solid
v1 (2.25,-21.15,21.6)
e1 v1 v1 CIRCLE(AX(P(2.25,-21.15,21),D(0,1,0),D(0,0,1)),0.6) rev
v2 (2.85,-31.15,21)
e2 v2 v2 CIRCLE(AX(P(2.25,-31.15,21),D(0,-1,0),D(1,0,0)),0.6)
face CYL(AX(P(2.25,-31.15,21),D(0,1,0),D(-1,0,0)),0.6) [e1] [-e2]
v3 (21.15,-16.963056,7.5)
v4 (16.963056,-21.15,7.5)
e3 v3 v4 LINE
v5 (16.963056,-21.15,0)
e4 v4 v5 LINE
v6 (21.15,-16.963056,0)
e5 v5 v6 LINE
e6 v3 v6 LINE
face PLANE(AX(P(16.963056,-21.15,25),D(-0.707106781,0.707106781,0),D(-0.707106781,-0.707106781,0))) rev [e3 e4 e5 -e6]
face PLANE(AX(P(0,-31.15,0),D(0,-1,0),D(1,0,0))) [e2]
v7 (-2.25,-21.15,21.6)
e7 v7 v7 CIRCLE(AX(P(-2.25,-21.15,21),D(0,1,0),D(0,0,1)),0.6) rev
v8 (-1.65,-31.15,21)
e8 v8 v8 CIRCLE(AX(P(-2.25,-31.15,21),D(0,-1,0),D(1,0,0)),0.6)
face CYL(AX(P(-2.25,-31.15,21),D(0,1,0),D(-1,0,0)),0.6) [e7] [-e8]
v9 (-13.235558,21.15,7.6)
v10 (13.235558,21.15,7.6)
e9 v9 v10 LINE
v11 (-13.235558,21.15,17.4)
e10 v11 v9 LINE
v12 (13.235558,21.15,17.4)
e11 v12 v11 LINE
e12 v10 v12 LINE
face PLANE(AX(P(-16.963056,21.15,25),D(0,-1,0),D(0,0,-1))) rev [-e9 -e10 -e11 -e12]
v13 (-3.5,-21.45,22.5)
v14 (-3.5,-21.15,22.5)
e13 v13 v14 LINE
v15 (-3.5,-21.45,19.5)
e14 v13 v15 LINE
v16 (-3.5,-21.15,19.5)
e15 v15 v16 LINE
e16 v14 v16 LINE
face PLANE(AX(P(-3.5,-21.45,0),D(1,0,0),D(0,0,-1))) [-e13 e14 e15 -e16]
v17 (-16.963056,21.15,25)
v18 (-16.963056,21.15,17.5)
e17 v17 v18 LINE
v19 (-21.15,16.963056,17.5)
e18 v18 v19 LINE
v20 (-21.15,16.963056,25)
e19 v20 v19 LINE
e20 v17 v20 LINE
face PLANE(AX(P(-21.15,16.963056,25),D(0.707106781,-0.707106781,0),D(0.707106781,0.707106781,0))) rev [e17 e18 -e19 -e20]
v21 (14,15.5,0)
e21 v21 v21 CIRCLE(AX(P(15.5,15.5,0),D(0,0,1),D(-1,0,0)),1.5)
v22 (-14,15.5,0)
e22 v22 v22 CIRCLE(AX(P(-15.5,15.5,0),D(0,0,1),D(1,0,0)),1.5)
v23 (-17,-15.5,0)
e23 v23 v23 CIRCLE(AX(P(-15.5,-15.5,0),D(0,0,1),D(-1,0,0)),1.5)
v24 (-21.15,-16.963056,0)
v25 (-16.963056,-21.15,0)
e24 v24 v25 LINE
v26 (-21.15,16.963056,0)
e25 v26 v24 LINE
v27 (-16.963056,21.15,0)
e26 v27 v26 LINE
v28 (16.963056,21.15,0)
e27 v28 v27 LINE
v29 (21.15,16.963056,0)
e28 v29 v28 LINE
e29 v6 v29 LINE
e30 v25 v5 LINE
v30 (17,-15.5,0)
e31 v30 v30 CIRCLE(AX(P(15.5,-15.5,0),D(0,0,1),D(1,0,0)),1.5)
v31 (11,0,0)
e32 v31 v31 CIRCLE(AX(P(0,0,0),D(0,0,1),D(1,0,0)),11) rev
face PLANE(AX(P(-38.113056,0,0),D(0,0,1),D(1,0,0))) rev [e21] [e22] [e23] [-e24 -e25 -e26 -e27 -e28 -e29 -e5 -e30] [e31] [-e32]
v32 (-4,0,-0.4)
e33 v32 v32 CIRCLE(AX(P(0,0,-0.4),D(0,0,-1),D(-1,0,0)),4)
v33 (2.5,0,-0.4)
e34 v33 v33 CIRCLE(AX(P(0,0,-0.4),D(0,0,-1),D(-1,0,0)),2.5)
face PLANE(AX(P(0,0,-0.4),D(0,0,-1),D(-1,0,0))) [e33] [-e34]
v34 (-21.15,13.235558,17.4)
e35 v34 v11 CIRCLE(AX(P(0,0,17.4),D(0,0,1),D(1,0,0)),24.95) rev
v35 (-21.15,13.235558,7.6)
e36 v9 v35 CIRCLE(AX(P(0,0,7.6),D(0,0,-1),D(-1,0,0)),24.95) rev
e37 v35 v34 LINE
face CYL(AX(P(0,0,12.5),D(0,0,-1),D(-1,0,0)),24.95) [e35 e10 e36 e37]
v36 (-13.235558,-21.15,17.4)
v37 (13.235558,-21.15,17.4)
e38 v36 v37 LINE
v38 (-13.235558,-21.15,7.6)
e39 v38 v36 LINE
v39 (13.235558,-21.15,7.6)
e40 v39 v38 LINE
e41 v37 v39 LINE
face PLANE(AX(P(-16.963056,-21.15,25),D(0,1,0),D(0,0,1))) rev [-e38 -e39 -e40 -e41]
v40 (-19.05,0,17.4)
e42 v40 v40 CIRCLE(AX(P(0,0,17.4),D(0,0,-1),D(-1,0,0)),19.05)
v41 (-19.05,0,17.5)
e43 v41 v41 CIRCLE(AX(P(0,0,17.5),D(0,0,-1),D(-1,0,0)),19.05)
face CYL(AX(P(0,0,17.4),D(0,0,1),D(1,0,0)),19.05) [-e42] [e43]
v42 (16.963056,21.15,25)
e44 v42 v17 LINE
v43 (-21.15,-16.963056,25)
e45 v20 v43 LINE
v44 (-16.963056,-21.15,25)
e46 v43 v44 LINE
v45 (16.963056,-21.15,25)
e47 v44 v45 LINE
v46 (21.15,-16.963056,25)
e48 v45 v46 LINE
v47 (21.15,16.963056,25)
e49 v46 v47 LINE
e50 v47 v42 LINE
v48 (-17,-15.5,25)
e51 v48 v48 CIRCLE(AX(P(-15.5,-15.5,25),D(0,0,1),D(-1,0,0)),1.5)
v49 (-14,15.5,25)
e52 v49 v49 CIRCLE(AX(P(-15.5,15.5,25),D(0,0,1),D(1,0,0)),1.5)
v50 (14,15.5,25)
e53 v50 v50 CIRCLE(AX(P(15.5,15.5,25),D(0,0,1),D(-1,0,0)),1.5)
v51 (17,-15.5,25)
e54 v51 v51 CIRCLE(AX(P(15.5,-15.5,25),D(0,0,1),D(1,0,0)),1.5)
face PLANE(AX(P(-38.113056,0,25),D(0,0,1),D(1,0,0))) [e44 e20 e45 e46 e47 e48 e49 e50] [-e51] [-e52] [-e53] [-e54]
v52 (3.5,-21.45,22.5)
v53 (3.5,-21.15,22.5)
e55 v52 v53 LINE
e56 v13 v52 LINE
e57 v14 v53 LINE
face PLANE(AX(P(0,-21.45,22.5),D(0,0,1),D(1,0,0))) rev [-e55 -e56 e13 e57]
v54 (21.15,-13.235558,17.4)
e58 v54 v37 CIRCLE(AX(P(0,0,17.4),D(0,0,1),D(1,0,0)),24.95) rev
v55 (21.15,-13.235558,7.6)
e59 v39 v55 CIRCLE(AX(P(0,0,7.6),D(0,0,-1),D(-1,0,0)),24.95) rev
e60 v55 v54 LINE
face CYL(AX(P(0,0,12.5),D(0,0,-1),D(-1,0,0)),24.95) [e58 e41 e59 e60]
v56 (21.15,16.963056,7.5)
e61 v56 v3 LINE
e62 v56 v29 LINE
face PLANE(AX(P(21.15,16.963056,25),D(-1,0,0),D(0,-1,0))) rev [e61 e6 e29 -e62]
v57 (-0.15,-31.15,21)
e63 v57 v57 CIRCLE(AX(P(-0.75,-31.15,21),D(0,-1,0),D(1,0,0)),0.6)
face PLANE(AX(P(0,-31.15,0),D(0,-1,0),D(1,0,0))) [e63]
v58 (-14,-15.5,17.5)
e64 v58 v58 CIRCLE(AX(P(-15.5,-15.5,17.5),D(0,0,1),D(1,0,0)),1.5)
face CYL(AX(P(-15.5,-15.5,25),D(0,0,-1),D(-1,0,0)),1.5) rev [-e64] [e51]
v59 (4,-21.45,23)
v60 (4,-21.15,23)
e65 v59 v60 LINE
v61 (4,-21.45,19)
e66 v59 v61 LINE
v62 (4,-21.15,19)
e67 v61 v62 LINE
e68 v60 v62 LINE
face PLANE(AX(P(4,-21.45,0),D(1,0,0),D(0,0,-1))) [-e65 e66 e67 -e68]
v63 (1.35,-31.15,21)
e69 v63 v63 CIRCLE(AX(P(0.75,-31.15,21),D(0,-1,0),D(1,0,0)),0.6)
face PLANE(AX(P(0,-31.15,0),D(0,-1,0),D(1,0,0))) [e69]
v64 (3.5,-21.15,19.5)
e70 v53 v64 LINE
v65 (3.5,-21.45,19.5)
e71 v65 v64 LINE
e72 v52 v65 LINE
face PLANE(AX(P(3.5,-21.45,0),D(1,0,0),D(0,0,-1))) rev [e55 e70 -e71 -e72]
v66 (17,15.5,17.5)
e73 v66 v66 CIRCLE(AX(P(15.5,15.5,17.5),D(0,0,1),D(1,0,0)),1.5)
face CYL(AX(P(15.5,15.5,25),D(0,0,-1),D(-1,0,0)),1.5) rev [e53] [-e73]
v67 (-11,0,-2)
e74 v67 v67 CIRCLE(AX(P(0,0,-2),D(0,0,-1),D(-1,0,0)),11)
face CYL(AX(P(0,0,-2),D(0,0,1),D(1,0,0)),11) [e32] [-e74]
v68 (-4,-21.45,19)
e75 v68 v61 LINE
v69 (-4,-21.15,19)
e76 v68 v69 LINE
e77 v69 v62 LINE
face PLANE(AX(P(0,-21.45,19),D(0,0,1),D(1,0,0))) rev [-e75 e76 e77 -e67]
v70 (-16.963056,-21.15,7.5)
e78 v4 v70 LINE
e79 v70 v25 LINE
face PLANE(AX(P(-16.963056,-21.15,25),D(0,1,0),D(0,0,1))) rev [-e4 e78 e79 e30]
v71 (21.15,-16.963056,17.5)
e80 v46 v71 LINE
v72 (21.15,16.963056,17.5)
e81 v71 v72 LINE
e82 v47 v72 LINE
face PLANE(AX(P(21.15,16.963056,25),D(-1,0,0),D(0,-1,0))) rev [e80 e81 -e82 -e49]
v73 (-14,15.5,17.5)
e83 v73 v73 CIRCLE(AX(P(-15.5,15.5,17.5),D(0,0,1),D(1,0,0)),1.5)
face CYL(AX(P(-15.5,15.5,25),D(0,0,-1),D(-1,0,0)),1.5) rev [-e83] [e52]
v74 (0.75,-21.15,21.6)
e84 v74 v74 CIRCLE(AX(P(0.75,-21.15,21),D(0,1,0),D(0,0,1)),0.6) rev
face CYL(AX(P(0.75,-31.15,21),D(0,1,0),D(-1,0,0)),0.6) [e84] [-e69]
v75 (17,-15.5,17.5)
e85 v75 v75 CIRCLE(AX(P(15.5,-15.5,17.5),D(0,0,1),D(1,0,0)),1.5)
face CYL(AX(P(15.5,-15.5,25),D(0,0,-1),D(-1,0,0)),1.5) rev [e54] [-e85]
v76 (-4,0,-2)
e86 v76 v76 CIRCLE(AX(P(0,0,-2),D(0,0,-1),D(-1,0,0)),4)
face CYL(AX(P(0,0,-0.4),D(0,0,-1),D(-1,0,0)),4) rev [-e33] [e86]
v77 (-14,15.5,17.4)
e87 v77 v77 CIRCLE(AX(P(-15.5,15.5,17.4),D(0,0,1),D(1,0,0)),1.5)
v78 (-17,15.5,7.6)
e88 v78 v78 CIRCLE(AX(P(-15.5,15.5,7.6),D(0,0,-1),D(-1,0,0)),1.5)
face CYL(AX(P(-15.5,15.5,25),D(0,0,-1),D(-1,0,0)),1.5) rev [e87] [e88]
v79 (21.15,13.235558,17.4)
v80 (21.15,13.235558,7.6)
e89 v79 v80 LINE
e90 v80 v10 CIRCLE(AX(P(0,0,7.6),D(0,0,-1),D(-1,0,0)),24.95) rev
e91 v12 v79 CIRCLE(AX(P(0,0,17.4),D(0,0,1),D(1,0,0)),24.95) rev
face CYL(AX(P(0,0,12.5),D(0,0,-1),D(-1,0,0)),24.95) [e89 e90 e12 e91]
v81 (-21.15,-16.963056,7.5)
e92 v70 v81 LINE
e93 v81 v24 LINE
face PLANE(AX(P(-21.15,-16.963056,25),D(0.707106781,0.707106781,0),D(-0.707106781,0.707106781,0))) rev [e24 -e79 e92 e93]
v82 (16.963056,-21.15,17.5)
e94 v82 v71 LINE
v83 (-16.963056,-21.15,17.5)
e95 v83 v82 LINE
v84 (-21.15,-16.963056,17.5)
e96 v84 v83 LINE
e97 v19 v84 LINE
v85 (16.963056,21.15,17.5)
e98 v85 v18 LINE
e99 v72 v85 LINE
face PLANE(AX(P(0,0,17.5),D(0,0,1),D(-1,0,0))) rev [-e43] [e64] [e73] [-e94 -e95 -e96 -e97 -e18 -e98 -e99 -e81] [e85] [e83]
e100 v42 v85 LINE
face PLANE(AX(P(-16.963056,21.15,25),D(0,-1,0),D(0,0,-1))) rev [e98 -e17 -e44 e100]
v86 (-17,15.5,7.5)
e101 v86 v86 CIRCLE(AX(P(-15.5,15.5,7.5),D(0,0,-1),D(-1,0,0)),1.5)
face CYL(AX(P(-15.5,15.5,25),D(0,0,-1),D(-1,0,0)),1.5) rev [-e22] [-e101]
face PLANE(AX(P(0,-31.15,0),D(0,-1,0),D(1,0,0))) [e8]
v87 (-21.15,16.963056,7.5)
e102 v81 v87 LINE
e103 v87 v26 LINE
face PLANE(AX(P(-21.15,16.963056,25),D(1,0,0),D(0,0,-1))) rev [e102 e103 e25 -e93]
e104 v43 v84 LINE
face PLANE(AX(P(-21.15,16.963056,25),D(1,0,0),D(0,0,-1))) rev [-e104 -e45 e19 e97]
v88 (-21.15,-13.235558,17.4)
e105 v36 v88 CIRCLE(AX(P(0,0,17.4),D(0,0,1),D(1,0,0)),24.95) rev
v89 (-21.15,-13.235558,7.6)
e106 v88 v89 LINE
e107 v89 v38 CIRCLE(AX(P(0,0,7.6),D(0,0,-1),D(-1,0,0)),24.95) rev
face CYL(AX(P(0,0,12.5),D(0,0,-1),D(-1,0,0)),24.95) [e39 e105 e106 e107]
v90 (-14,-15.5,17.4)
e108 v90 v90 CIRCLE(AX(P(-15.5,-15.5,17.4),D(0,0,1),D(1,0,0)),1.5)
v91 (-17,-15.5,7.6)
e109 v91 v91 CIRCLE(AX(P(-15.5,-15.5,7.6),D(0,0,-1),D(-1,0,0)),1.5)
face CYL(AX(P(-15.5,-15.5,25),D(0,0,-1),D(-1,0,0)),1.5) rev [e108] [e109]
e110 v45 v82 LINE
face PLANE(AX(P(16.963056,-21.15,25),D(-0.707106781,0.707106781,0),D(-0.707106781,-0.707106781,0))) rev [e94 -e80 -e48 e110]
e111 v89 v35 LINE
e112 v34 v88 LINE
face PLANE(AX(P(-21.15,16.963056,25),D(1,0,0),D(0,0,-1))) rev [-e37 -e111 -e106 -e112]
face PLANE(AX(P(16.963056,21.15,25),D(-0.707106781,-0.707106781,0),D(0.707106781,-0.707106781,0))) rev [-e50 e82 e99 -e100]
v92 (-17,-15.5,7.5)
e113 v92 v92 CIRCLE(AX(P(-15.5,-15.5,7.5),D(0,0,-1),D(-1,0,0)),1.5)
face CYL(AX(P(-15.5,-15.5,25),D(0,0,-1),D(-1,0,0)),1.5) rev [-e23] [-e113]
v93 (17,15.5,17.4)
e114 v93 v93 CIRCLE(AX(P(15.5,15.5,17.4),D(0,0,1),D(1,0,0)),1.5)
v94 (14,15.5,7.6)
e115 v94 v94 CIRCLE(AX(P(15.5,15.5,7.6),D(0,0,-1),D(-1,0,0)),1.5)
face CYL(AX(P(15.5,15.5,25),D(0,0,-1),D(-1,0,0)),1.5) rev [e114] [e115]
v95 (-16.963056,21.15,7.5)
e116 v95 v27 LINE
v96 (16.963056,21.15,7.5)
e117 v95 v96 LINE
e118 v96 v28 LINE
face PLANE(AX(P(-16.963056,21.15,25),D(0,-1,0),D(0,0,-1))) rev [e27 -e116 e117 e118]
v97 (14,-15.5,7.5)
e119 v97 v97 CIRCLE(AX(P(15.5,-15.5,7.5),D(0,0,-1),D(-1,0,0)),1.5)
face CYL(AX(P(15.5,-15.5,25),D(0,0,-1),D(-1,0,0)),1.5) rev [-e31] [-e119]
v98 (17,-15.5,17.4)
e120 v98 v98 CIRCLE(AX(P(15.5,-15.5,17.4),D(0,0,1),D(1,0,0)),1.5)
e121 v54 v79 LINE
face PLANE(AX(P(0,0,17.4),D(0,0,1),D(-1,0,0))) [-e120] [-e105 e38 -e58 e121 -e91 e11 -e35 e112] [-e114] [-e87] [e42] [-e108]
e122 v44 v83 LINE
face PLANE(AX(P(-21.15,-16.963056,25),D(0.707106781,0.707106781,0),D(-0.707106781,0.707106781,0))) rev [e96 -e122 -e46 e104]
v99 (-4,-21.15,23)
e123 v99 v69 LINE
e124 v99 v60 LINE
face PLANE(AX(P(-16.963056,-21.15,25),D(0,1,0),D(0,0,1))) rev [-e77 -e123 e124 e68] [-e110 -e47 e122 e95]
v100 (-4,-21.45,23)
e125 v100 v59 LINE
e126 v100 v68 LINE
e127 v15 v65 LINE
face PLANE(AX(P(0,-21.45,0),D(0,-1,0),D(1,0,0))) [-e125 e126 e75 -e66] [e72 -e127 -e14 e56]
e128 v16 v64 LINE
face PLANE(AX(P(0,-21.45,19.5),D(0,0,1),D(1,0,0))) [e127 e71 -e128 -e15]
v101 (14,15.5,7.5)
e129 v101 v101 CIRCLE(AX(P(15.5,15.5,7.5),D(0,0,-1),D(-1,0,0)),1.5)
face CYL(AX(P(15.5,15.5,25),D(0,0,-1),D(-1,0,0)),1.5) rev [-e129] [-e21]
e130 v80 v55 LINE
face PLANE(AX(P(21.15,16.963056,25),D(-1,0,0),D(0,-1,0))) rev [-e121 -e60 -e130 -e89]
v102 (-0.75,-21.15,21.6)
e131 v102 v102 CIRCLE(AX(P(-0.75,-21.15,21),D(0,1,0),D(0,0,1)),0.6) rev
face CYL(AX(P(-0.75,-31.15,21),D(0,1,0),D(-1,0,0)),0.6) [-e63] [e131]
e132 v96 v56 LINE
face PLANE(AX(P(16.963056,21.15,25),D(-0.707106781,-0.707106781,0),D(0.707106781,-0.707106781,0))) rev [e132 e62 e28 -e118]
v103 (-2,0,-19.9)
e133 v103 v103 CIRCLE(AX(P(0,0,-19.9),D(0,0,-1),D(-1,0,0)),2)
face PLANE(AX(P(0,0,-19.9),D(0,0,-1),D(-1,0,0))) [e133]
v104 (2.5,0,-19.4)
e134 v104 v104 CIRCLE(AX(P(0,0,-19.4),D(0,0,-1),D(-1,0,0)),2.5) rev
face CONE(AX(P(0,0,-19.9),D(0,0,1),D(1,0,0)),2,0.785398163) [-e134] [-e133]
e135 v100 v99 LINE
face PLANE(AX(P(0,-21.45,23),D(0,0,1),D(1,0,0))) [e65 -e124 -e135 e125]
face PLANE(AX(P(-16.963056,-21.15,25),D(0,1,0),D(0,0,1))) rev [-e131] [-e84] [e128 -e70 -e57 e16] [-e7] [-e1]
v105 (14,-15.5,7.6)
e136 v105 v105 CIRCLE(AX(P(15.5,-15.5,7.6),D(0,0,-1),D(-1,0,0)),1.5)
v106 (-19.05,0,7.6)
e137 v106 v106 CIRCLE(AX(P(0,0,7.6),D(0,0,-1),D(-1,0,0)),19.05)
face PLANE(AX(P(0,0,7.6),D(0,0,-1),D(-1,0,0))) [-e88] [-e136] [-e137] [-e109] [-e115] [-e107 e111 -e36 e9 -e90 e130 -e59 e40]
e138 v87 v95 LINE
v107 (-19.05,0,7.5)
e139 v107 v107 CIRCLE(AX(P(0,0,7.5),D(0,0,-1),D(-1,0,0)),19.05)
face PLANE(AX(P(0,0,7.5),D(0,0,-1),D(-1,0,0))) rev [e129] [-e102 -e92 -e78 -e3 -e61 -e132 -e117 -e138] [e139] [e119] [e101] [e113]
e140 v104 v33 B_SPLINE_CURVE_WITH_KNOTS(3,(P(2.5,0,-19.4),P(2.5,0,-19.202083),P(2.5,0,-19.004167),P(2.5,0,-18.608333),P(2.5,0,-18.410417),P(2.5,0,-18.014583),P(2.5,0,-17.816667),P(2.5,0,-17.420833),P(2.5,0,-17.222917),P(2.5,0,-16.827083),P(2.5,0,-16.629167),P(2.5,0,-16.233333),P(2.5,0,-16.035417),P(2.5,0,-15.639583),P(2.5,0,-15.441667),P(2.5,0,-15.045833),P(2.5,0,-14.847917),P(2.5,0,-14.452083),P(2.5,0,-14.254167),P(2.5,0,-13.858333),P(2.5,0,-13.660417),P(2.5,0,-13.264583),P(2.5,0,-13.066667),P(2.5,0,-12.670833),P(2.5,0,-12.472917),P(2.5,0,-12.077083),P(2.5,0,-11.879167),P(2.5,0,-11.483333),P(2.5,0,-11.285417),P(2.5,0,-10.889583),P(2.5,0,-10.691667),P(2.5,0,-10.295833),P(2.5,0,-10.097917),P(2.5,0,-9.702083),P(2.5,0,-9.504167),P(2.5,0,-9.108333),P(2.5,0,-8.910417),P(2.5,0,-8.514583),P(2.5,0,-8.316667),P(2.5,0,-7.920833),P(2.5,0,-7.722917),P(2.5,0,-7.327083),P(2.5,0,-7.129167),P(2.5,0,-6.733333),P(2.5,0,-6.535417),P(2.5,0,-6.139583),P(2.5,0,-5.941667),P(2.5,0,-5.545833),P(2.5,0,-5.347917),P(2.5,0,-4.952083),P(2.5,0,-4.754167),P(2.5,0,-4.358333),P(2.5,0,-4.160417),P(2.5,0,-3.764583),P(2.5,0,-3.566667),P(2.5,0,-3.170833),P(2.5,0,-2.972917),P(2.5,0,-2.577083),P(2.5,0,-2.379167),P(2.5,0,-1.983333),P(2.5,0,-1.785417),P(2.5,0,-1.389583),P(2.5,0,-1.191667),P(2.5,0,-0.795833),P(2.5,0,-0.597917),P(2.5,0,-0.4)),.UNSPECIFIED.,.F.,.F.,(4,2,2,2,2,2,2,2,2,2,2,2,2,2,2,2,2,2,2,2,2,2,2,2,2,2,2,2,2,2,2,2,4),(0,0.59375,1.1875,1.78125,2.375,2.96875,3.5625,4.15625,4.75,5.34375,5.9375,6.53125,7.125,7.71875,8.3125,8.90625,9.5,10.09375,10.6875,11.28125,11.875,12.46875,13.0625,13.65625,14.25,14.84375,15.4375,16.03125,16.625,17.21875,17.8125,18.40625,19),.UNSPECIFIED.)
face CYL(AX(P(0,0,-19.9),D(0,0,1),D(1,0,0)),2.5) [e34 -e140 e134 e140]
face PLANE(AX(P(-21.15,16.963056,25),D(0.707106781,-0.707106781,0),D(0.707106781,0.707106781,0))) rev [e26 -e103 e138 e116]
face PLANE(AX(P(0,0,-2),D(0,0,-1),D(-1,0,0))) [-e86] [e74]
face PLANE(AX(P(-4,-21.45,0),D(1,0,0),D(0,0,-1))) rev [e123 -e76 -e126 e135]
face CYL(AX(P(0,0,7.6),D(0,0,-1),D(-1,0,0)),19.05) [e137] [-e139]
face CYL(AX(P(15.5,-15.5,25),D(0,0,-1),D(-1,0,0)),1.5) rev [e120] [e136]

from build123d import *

# Parameters (mm, degrees)
ESQUISSE1_R             = 1.5
EXTRUSION1_DEPTH        = 25
ESQUISSE10_W            = 8
ESQUISSE10_H            = 4
ESQUISSE10_W_2          = 7
ESQUISSE10_H_2          = 3
BOSS_EXTRU_2_DEPTH      = 0.3
ESQUISSE2_R             = 11
EXTRUSION2_DEPTH        = 2
ESQUISSE3_R             = 2.5
EXTRUSION3_DEPTH        = 17.9
ENL_V_START             = -1.6
ESQUISSE4_R             = 4
ESQUISSE4_R_2           = 2.5
ENL_V_MAT_EXTRU_1_DEPTH = 1.6
CHANFREIN1_SIZE         = 0.5
ESQUISSE6_R             = 34.95
ESQUISSE6_R_2           = 24.95
ENL_V_MAT_EXTRU_3_DEPTH = 5
ESQUISSE7_R             = 25.05
ESQUISSE7_R_2           = 19.05
ENL_V_MAT_EXTRU_4_DEPTH = 0.1
SYM_TRIE1_START         = 12.5
SYM_TRIE1_DEPTH         = 5
SYM_TRIE1_START_2       = 17.4
SYM_TRIE1_2_OUTLINE_R   = 19.05
SYM_TRIE1_2_DEPTH       = 0.1
ESQUISSE10_3_R          = 0.6
BOSS_EXTRU_3_DEPTH      = 10


# Read off the part's stored shape, not the designer's step: Symétrie1
with BuildPart() as part:
    # Esquisse1 → Extrusion1 (new body)
    with BuildSketch(Plane.XY):
        Polygon((-16.963055506, 21.15), (16.963055506, 21.15), (21.15, 16.963055506), (21.15, -16.963055506), (16.963055506, -21.15), (-16.963055506, -21.15), (-21.15, -16.963055506), (-21.15, 16.963055506), align=None)
        with Locations((-15.5, 15.5)):
            Circle(ESQUISSE1_R, mode=Mode.SUBTRACT)
        with Locations((15.5, -15.5)):
            Circle(ESQUISSE1_R, mode=Mode.SUBTRACT)
        with Locations(Location((-15.5, -15.5, 0), (0, 0, 180))):
            Circle(ESQUISSE1_R, mode=Mode.SUBTRACT)
        with Locations(Location((15.5, 15.5, 0), (0, 0, 180))):
            Circle(ESQUISSE1_R, mode=Mode.SUBTRACT)
    extrude(amount=EXTRUSION1_DEPTH)

    # Esquisse10 → Boss.-Extru.2 (add)
    with BuildSketch(Plane.XZ.offset(21.15)):
        with Locations((0, 21)):
            Rectangle(ESQUISSE10_W, ESQUISSE10_H)
        with Locations((0, 21)):
            Rectangle(ESQUISSE10_W_2, ESQUISSE10_H_2, mode=Mode.SUBTRACT)
    extrude(amount=BOSS_EXTRU_2_DEPTH)

    # Esquisse2 → Extrusion2 (add)
    with BuildSketch(Plane(origin=(0, 0, 0), x_dir=(-1, 0, 0), z_dir=(0, 0, -1))):
        with Locations(Location((0, 0, 0), (0, 0, 180))):
            Circle(ESQUISSE2_R)
    extrude(amount=EXTRUSION2_DEPTH)

    # Esquisse3 → Extrusion3 (add)
    with BuildSketch(Plane(origin=(0, 0, -2), x_dir=(-1, 0, 0), z_dir=(0, 0, -1))):
        with Locations(Location((0, 0, 0), (0, 0, 180))):
            Circle(ESQUISSE3_R)
    extrude(amount=EXTRUSION3_DEPTH)

    # Esquisse4 → Enlèv. mat.-Extru.1 (cut)
    with BuildSketch(Plane(origin=(0, 0, -2), x_dir=(-1, 0, 0), z_dir=(0, 0, -1)).offset(ENL_V_START)):
        Circle(ESQUISSE4_R)
        with Locations(Location((0, 0, 0), (0, 0, 180))):
            Circle(ESQUISSE4_R_2, mode=Mode.SUBTRACT)
    extrude(amount=ENL_V_MAT_EXTRU_1_DEPTH, mode=Mode.SUBTRACT)

    # Chanfrein1
    chanfrein1_edges = [part.edges().sort_by_distance(p)[0] for p in [
        (-2.5, 0, -19.9),
    ]]
    chamfer(chanfrein1_edges, length=CHANFREIN1_SIZE)

    # Esquisse6 → Enlèv. mat.-Extru.3 (cut)
    with BuildSketch(Plane(origin=(0, 0, 7.5), x_dir=(-1, 0, 0), z_dir=(0, 0, -1))):
        Circle(ESQUISSE6_R)
        Circle(ESQUISSE6_R_2, mode=Mode.SUBTRACT)
    extrude(amount=-ENL_V_MAT_EXTRU_3_DEPTH, mode=Mode.SUBTRACT)

    # Esquisse7 → Enlèv. mat.-Extru.4 (cut)
    with BuildSketch(Plane(origin=(0, 0, 7.5), x_dir=(-1, 0, 0), z_dir=(0, 0, -1))):
        Circle(ESQUISSE7_R)
        Circle(ESQUISSE7_R_2, mode=Mode.SUBTRACT)
    extrude(amount=-ENL_V_MAT_EXTRU_4_DEPTH, mode=Mode.SUBTRACT)

    # Symétrie1 outline → Symétrie1 (cut)
    with BuildSketch(Plane.XY.offset(SYM_TRIE1_START)):
        with BuildLine():
            Line((21.15, -16.963055506), (21.15, -13.235558167))
            ThreePointArc((21.15, -13.235558167), (17.642314191, -17.642314191), (13.235558167, -21.15))
            Line((13.235558167, -21.15), (16.963055506, -21.15))
            Line((16.963055506, -21.15), (21.15, -16.963055506))
        make_face()
        with BuildLine():
            ThreePointArc((13.235558167, 21.15), (17.642314191, 17.642314191), (21.15, 13.235558167))
            Line((21.15, 13.235558167), (21.15, 16.963055506))
            Line((21.15, 16.963055506), (16.963055506, 21.15))
            Line((16.963055506, 21.15), (13.235558167, 21.15))
        make_face()
        with BuildLine():
            Line((-16.963055506, -21.15), (-13.235558167, -21.15))
            ThreePointArc((-13.235558167, -21.15), (-17.642314191, -17.642314191), (-21.15, -13.235558167))
            Line((-21.15, -13.235558167), (-21.15, -16.963055506))
            Line((-21.15, -16.963055506), (-16.963055506, -21.15))
        make_face()
        with BuildLine():
            ThreePointArc((-21.15, 13.235558167), (-17.642314191, 17.642314191), (-13.235558167, 21.15))
            Line((-13.235558167, 21.15), (-16.963055506, 21.15))
            Line((-16.963055506, 21.15), (-21.15, 16.963055506))
            Line((-21.15, 16.963055506), (-21.15, 13.235558167))
        make_face()
    extrude(amount=SYM_TRIE1_DEPTH, mode=Mode.SUBTRACT)

    # Sym_trie1 2 outline → Sym_trie1 2 (cut)
    with BuildSketch(Plane.XY.offset(SYM_TRIE1_START_2)):
        with BuildLine():
            ThreePointArc((13.235558167, -21.15), (17.642314191, -17.642314191), (21.15, -13.235558167))
            Line((21.15, -13.235558167), (21.15, 13.235558167))
            ThreePointArc((21.15, 13.235558167), (17.642314191, 17.642314191), (13.235558167, 21.15))
            Line((13.235558167, 21.15), (-13.235558167, 21.15))
            ThreePointArc((-13.235558167, 21.15), (-17.642314191, 17.642314191), (-21.15, 13.235558167))
            Line((-21.15, 13.235558167), (-21.15, -13.235558167))
            ThreePointArc((-21.15, -13.235558167), (-17.642314191, -17.642314191), (-13.235558167, -21.15))
            Line((-13.235558167, -21.15), (13.235558167, -21.15))
        make_face()
        Circle(SYM_TRIE1_2_OUTLINE_R, mode=Mode.SUBTRACT)
    extrude(amount=SYM_TRIE1_2_DEPTH, mode=Mode.SUBTRACT)

    # Esquisse10<3> → Boss.-Extru.3 (add)
    with BuildSketch(Plane.XZ.offset(21.15)):
        with Locations(Location((2.25, 21, 0), (0, 0, 90))):
            Circle(ESQUISSE10_3_R)
        with Locations(Location((0.75, 21, 0), (0, 0, 90))):
            Circle(ESQUISSE10_3_R)
        with Locations(Location((-0.75, 21, 0), (0, 0, 90))):
            Circle(ESQUISSE10_3_R)
        with Locations(Location((-2.25, 21, 0), (0, 0, 90))):
            Circle(ESQUISSE10_3_R)
    extrude(amount=BOSS_EXTRU_3_DEPTH)


solid = part.part
